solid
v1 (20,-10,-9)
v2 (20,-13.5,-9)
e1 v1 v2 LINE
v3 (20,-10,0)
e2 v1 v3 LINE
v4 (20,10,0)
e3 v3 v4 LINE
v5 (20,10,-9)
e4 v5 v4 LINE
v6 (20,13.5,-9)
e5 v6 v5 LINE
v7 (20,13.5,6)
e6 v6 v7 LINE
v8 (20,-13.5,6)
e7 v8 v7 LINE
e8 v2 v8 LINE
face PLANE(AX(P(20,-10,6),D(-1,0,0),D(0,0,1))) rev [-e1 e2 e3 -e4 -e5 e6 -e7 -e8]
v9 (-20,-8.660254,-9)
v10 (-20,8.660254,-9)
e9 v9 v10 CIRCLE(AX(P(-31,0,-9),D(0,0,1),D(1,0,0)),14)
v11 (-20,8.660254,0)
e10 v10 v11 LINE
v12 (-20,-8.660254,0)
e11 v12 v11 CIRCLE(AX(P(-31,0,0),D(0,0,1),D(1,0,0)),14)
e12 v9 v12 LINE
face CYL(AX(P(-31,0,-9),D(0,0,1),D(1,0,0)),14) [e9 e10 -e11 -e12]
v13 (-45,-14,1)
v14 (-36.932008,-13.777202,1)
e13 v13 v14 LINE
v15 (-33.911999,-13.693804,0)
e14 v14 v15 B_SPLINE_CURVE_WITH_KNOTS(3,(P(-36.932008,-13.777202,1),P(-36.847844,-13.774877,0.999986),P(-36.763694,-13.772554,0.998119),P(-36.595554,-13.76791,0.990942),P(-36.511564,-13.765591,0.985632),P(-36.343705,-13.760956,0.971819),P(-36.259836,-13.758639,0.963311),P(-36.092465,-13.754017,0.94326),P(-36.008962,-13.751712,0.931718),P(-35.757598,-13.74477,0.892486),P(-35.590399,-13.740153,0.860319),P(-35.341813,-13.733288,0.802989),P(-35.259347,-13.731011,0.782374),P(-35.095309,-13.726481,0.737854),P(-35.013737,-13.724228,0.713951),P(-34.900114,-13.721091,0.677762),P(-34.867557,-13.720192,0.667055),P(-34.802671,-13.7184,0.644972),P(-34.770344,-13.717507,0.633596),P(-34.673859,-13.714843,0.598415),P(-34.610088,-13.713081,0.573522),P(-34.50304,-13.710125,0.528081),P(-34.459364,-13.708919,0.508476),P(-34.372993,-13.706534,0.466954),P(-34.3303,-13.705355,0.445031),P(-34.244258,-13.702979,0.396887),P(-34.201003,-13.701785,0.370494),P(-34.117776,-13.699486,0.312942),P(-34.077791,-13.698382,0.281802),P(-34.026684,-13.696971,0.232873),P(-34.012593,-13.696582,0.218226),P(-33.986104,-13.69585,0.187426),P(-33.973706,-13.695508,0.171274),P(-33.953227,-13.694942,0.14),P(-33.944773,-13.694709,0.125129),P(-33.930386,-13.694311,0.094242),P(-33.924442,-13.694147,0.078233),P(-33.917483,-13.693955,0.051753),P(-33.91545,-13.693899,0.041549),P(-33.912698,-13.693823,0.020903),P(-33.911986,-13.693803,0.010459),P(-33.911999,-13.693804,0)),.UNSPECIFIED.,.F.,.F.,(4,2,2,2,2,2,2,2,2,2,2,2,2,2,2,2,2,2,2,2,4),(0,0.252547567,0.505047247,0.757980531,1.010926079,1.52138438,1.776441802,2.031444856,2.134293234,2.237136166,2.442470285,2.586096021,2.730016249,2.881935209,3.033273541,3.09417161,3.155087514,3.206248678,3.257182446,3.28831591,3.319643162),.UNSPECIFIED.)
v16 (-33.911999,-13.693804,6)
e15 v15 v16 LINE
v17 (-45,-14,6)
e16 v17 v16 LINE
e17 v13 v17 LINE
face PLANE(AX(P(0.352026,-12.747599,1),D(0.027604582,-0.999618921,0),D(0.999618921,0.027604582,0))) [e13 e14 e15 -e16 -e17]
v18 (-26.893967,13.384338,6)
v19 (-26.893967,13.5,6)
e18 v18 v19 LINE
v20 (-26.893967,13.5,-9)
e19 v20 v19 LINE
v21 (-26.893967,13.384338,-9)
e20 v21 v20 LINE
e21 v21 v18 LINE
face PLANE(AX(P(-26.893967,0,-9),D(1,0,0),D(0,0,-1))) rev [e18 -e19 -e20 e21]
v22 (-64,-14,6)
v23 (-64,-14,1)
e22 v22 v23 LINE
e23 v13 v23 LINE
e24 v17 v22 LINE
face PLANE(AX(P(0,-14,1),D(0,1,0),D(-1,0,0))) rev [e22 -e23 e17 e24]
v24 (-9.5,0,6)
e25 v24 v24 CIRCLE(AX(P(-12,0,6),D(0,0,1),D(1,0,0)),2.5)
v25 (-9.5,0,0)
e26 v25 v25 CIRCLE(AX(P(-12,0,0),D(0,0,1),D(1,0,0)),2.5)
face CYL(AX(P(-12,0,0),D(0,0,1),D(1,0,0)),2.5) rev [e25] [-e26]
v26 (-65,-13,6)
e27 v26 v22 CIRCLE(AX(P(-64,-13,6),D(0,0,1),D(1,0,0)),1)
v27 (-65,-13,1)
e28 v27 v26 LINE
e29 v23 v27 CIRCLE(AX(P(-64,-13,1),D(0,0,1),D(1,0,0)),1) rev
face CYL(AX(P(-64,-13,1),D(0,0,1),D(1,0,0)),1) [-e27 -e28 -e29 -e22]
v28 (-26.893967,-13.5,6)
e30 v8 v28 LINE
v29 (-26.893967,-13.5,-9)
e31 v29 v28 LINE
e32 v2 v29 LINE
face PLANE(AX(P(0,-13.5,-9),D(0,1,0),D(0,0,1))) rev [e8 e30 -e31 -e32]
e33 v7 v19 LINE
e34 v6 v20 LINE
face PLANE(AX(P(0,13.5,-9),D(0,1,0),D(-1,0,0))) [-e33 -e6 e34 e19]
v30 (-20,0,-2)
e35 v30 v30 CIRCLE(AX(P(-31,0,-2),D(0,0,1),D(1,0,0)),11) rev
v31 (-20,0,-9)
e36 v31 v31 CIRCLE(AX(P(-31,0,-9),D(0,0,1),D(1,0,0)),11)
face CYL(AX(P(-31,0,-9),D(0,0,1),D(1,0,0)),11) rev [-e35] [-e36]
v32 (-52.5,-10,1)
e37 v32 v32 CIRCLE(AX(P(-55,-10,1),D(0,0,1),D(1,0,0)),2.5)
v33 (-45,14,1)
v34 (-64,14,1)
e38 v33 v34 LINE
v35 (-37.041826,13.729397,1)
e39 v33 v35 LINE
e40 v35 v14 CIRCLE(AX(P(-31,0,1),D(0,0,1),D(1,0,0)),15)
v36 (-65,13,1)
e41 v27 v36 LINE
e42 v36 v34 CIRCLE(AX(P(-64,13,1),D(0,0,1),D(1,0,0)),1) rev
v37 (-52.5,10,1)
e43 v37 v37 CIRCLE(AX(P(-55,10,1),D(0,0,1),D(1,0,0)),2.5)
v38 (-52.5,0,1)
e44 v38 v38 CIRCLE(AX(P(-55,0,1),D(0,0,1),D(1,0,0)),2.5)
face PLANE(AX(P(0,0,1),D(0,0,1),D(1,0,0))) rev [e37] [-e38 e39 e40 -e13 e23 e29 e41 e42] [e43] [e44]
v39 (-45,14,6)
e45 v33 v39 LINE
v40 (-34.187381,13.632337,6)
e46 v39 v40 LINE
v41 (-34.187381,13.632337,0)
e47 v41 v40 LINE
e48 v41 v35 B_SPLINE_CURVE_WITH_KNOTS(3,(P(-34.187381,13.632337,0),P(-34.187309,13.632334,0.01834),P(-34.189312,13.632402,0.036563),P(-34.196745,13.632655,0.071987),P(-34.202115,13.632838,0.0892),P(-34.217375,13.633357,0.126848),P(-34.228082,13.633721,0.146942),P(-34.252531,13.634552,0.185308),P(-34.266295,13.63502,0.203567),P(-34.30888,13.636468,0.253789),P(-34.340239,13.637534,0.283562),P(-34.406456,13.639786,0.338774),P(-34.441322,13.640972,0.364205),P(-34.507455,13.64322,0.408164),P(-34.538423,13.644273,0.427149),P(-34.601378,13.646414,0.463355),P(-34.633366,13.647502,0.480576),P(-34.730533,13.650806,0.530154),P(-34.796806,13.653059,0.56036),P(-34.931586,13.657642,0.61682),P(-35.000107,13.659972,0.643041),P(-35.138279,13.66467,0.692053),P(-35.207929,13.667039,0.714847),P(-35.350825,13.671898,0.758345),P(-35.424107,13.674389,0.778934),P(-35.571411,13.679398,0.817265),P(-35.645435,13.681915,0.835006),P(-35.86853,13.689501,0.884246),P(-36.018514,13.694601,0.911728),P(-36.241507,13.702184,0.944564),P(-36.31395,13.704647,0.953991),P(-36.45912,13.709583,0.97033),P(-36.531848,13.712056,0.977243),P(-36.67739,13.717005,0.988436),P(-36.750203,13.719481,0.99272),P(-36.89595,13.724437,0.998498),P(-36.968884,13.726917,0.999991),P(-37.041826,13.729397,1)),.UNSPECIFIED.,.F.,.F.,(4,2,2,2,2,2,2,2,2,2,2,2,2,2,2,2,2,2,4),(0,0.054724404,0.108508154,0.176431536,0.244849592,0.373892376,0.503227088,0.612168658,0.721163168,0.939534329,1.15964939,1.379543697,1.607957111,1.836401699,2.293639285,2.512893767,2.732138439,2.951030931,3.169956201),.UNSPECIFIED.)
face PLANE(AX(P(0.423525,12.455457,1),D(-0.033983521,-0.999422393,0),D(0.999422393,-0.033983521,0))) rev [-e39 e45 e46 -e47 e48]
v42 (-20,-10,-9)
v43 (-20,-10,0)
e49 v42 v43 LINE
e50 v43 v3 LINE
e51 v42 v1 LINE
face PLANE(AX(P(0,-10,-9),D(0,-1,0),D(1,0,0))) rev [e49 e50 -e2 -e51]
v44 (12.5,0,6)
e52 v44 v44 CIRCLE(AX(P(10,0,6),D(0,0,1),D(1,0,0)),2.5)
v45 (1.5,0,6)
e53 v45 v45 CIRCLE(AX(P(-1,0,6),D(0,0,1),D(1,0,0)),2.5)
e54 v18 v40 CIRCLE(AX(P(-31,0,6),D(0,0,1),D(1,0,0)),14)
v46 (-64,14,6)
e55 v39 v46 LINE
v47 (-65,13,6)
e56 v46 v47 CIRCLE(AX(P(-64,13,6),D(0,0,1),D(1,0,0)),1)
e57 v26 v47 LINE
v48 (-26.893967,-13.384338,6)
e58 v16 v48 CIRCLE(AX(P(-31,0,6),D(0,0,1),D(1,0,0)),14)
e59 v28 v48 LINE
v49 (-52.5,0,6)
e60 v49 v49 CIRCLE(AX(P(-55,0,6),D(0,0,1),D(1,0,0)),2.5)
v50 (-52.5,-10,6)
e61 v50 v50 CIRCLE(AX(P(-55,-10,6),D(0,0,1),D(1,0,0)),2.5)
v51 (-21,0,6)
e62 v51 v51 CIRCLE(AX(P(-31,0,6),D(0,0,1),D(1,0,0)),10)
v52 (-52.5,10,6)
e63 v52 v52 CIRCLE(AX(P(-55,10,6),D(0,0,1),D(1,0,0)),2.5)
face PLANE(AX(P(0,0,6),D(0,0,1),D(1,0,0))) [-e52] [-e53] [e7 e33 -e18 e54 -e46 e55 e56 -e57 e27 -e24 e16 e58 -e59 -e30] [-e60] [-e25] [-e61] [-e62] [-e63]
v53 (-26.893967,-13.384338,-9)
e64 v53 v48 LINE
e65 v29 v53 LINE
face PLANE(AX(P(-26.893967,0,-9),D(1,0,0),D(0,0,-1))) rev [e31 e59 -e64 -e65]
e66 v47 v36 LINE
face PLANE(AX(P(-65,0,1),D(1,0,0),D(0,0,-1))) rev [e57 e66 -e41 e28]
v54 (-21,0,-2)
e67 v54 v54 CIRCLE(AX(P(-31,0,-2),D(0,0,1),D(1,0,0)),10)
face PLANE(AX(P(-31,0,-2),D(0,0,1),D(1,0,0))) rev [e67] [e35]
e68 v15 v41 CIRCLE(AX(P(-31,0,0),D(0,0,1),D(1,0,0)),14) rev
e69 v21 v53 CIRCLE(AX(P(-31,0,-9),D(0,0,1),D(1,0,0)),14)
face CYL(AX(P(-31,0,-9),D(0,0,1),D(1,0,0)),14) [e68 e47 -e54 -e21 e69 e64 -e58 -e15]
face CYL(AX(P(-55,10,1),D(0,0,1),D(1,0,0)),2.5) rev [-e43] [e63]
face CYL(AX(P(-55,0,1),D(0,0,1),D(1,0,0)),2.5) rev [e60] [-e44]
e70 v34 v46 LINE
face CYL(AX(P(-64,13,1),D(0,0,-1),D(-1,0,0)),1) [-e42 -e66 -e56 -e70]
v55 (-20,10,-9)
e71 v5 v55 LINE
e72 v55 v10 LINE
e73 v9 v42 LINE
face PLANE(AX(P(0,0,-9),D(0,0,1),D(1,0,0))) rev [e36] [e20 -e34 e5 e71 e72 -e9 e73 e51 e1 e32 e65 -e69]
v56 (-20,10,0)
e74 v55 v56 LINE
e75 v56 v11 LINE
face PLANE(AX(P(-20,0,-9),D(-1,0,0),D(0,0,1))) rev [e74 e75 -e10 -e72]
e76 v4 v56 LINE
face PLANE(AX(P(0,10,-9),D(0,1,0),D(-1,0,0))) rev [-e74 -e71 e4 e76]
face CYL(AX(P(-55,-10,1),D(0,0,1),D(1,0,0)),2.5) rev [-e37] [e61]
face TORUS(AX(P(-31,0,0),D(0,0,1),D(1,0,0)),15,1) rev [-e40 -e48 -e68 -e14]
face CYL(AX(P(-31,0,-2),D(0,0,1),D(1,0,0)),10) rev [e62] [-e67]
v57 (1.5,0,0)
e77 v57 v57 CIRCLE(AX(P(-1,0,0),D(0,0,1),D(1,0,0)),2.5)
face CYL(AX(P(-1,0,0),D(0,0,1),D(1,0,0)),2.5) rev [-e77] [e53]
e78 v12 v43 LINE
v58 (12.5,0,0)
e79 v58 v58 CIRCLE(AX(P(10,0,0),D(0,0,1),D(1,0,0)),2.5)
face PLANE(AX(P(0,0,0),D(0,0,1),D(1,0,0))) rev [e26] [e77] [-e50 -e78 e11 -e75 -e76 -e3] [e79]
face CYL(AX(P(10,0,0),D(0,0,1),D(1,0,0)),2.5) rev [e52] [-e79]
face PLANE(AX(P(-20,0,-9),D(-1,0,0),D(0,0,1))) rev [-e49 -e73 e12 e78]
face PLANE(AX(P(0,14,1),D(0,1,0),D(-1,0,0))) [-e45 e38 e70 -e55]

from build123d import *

# Parameters (mm, degrees)
SKETCH_1_W          = 40
SKETCH_1_H          = 20
EXTRUDE_1_DEPTH     = 6
SKETCH_2_R          = 2.5
CUT_EXTRUDE_1_DEPTH = 24.151673806
SKETCH_3_R          = 11
EXTRUDE_2_DEPTH     = 15
SKETCH_5_R          = 11
SKETCH_5_R_2        = 10
EXTRUDE_3_DEPTH     = 8
EXTRUDE_4_DEPTH     = 5
FILLET_1_R          = 1
FILLET_2_R          = 1
SKETCH_9_R          = 2.5
CUT_EXTRUDE_2_DEPTH = 5


with BuildPart() as part:
    # 草图1 → 凸台-拉伸1 (new body)
    with BuildSketch(Plane.XY):
        Rectangle(SKETCH_1_W, SKETCH_1_H)
    extrude(amount=EXTRUDE_1_DEPTH)

    # 草图2 → 切除-拉伸1 (cut, through all)
    with BuildSketch(Plane.XY.offset(6)):
        with Locations((10, 0)):
            Circle(SKETCH_2_R)
        with Locations((-1, 0)):
            Circle(SKETCH_2_R)
        with Locations((-12, 0)):
            Circle(SKETCH_2_R)
    extrude(amount=-CUT_EXTRUDE_1_DEPTH, mode=Mode.SUBTRACT)

    # 草图3 → 凸台-拉伸2 (add)
    with BuildSketch(Plane.XY.offset(6)):
        with BuildLine():
            Line((20, 10), (20, 13.5))
            Line((20, 13.5), (-26.893967141, 13.5))
            Line((-26.893967141, 13.5), (-26.893967141, 13.384337644))
            ThreePointArc((-26.893967141, 13.384337644), (-45, 0), (-26.893967141, -13.384337644))
            Line((-26.893967141, -13.384337644), (-26.893967141, -13.5))
            Line((-26.893967141, -13.5), (20, -13.5))
            Line((20, -13.5), (20, -10))
            Line((20, -10), (-20, -10))
            Line((-20, -10), (-20, -8.660254038))
            ThreePointArc((-20, -8.660254038), (-17, 0), (-20, 8.660254038))
            Line((-20, 8.660254038), (-20, 10))
            Line((-20, 10), (20, 10))
        make_face()
        with Locations((-31, 0)):
            Circle(SKETCH_3_R, mode=Mode.SUBTRACT)
    extrude(amount=-EXTRUDE_2_DEPTH)

    # 草图5 → 凸台-拉伸3 (add)
    with BuildSketch(Plane.XY.offset(6)):
        with Locations((-31, 0)):
            Circle(SKETCH_5_R)
        with Locations((-31, 0)):
            Circle(SKETCH_5_R_2, mode=Mode.SUBTRACT)
    extrude(amount=-EXTRUDE_3_DEPTH)

    # 草图8 → 凸台-拉伸4 (add)
    with BuildSketch(Plane.XY.offset(6)):
        with BuildLine():
            ThreePointArc((-33.911999365, -13.693803697), (-44.999289152, -0.141078849), (-34.187380521, 13.632336755))
            Line((-34.187380521, 13.632336755), (-45, 14))
            Line((-45, 14), (-65, 14))
            Line((-65, 14), (-65, -14))
            Line((-65, -14), (-45, -14))
            Line((-45, -14), (-33.911999365, -13.693803697))
        make_face()
    extrude(amount=-EXTRUDE_4_DEPTH)

    # 圆角1
    fillet_1_edges = [part.edges().sort_by_distance(p)[0] for p in [
        (-44.999289152, -0.141078849, 1),
    ]]
    fillet(fillet_1_edges, radius=FILLET_1_R)

    # 圆角2
    fillet_2_edges = [part.edges().sort_by_distance(p)[0] for p in [
        (-65, 14, 3.5),
        (-65, -14, 3.5),
    ]]
    fillet(fillet_2_edges, radius=FILLET_2_R)

    # 草图9 → 切除-拉伸2 (cut)
    with BuildSketch(Plane.XY.offset(6)):
        with Locations((-55, 0)):
            Circle(SKETCH_9_R)
        with Locations((-55, 10)):
            Circle(SKETCH_9_R)
        with Locations((-55, -10)):
            Circle(SKETCH_9_R)
    extrude(amount=-CUT_EXTRUDE_2_DEPTH, mode=Mode.SUBTRACT)


solid = part.part
